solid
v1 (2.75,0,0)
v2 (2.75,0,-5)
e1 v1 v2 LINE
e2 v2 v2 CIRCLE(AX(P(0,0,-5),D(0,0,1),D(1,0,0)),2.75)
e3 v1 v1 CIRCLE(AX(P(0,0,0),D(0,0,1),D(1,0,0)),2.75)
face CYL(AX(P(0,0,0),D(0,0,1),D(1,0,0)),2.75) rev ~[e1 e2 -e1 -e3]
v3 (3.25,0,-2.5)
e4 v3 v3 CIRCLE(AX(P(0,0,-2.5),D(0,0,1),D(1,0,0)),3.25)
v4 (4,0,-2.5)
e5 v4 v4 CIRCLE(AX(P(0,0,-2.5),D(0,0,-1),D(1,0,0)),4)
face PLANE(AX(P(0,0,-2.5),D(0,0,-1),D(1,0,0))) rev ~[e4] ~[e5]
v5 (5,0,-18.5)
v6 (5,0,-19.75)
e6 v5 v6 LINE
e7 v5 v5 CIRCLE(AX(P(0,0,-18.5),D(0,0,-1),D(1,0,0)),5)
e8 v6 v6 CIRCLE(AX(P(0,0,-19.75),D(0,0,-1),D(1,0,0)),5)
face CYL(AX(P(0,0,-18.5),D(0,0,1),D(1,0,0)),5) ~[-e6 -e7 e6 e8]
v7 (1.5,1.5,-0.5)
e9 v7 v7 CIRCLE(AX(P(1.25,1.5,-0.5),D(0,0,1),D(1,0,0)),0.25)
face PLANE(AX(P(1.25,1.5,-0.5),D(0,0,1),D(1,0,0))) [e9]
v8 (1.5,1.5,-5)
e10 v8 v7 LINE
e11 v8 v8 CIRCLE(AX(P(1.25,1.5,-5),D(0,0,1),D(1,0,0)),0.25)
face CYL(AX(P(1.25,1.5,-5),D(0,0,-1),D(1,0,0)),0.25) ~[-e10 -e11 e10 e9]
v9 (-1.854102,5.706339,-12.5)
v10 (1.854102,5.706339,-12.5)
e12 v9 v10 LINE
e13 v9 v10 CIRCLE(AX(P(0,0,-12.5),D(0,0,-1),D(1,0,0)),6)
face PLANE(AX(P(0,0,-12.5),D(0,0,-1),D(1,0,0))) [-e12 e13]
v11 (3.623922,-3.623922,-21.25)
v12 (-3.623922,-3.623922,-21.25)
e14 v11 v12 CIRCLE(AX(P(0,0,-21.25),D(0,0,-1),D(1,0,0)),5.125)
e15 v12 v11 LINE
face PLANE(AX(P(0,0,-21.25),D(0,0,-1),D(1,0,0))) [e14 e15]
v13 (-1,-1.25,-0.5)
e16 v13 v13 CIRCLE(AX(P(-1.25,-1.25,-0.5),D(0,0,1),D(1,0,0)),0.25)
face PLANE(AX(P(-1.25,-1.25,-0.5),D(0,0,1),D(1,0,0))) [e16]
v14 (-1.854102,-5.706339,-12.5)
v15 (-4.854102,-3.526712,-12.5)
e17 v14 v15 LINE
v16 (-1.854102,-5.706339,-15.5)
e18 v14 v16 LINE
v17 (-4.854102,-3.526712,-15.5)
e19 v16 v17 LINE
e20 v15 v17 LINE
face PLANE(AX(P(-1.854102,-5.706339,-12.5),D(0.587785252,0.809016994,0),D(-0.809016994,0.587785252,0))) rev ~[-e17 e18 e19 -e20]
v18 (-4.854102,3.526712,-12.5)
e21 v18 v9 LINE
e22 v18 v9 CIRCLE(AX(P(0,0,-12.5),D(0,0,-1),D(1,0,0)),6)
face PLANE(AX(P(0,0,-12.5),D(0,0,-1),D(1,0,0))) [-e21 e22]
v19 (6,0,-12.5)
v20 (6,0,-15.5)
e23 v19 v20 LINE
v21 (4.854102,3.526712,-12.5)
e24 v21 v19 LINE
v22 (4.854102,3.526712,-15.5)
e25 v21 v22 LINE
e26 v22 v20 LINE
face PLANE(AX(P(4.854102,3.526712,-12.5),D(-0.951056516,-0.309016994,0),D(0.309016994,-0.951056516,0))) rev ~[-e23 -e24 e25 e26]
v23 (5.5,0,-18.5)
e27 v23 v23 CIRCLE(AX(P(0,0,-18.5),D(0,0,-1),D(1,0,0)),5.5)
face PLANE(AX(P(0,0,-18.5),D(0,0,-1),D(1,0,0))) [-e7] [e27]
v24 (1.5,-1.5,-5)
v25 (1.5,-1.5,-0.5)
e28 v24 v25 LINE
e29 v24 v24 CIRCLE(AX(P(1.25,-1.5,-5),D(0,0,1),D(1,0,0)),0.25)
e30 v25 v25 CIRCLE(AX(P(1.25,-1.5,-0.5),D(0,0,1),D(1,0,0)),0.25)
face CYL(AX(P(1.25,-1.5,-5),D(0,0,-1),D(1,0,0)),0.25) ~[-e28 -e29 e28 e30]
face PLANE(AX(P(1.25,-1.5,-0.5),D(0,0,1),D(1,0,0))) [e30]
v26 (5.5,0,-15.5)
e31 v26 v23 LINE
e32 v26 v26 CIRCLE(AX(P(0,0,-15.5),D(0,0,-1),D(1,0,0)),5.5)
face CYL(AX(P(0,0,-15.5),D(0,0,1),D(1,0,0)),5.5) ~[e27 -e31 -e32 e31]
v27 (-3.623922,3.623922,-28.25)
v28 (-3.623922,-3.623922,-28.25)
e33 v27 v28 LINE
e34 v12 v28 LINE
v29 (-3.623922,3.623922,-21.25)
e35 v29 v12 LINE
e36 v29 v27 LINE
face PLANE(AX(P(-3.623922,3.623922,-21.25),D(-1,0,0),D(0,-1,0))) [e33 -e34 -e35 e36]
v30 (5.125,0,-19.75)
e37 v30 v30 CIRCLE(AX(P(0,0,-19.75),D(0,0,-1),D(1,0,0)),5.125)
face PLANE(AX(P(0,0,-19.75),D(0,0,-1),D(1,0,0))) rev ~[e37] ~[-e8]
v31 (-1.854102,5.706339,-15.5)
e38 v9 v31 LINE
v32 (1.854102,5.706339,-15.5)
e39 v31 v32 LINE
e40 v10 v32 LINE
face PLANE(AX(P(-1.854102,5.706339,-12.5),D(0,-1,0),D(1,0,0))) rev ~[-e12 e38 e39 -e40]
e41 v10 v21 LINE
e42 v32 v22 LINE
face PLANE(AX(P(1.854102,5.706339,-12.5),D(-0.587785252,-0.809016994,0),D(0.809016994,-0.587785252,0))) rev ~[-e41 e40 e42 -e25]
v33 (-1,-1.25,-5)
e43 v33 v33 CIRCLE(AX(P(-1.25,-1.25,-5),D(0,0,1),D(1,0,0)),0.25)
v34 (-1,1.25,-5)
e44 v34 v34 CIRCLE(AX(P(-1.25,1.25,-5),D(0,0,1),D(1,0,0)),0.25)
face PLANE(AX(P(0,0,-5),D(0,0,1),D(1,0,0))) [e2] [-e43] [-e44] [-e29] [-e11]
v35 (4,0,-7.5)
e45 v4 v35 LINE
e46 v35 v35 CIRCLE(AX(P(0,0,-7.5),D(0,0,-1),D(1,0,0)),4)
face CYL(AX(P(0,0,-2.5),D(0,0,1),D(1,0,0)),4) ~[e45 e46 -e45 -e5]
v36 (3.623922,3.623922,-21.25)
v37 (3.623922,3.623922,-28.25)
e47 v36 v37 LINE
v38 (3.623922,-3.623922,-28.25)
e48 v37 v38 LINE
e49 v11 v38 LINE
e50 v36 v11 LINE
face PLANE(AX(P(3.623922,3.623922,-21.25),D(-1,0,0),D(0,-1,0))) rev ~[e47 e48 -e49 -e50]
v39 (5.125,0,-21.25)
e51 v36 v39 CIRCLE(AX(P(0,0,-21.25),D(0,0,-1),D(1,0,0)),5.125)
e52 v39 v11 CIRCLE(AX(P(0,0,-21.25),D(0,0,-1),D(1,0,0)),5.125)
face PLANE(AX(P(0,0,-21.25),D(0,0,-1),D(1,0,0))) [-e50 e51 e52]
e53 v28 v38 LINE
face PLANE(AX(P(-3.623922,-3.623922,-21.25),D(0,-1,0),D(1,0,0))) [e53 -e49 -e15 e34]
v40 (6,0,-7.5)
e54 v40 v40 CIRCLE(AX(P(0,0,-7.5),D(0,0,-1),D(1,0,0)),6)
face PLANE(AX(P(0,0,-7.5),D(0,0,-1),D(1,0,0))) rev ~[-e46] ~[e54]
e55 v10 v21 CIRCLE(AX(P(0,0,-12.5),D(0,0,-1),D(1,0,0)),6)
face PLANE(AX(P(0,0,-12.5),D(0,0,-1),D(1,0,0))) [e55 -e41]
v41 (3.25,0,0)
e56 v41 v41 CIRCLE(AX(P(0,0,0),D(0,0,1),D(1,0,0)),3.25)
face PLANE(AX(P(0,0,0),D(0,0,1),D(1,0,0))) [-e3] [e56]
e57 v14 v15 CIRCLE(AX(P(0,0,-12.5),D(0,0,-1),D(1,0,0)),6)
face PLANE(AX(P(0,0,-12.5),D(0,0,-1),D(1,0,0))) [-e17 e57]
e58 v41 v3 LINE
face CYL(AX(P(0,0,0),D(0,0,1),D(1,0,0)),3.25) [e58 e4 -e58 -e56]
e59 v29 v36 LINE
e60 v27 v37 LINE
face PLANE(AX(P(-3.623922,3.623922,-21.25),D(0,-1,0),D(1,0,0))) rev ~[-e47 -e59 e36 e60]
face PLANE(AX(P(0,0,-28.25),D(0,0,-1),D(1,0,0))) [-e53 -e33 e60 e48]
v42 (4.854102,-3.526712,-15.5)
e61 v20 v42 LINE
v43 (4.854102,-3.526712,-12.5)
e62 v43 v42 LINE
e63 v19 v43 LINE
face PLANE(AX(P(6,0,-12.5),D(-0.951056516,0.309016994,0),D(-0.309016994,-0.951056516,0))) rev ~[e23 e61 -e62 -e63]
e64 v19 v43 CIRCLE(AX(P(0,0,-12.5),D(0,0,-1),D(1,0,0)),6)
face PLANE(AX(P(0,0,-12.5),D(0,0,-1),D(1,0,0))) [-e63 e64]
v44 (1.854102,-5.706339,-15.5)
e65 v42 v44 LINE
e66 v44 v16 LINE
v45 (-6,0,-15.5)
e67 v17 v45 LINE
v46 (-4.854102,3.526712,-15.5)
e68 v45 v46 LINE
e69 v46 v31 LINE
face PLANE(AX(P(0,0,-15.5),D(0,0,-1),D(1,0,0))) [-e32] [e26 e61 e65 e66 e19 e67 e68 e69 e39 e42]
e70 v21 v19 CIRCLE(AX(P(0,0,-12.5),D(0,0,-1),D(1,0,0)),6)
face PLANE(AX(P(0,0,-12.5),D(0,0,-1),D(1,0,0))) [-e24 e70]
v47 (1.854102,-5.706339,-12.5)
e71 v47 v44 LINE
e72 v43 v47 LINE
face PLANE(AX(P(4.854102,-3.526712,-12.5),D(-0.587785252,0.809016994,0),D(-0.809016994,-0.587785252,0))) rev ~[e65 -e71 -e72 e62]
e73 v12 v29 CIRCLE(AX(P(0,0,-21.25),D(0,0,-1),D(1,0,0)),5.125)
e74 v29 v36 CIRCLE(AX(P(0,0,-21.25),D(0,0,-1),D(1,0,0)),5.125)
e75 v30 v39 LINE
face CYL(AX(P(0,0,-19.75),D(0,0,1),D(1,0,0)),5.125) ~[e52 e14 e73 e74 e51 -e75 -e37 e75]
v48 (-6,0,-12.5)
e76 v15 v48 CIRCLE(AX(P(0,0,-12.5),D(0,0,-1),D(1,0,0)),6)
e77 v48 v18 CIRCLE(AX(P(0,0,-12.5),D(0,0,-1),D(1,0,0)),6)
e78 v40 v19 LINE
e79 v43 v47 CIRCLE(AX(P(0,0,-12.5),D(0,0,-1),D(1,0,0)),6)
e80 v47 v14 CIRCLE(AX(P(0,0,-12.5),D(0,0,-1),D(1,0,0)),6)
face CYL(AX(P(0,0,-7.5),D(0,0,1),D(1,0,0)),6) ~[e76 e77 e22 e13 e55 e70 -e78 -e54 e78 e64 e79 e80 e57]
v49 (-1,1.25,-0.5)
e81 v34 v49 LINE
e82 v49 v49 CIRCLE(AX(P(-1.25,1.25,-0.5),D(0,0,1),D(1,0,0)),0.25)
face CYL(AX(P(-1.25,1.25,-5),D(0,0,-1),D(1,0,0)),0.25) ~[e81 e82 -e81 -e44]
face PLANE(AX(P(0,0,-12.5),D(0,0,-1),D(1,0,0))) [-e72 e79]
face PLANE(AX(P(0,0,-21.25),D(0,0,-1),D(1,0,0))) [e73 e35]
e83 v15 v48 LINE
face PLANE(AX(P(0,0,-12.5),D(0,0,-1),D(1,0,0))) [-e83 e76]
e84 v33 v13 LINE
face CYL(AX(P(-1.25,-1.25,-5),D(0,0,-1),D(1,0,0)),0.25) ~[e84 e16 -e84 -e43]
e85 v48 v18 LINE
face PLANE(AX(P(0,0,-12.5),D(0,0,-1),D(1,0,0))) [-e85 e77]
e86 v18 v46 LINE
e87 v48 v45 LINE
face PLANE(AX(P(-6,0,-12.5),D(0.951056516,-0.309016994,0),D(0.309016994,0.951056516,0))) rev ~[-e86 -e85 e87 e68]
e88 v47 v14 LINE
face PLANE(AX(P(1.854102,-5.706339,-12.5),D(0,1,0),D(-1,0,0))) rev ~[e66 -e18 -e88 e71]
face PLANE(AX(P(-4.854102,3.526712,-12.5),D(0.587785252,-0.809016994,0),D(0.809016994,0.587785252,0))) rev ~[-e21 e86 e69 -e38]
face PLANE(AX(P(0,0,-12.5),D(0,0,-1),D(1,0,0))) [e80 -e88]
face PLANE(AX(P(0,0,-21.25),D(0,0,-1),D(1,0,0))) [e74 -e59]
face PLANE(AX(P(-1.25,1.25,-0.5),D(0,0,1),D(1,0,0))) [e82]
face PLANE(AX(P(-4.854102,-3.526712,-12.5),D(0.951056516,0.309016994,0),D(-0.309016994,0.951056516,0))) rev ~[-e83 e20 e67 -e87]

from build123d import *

# Parameters (mm, degrees)
F0_R      = 3.25
F1_DEPTH  = 2.5
F2_R      = 4
F2_R_2    = 3.25
F3_DEPTH  = 5
F4_R      = 6
F4_R_2    = 4
F5_DEPTH  = 5
F7_DEPTH  = 3
F8_R      = 5.5
F9_DEPTH  = 3
F10_R     = 5
F11_DEPTH = 1.25
F12_R     = 5.125
F12_R_2   = 5
F13_DEPTH = 1.5
F14_W     = 7.2478445072
F14_H     = 7.2478445072
F15_DEPTH = 7
F16_R     = 2.75
F17_DEPTH = 5
F18_R     = 0.25
F19_DEPTH = 4.5


with BuildPart() as f1:
    # F0 (on Top) → F1 (new body)
    with BuildSketch(Plane.XY):
        Circle(F0_R)
    extrude(amount=-F1_DEPTH)

    # F2 (on face) → F3 (join)
    with BuildSketch(Plane(origin=(0, 0, -2.5), x_dir=(1, 0, 0), z_dir=(0, 0, -1))):
        Circle(F2_R)
        Circle(F2_R_2, mode=Mode.SUBTRACT)
        Circle(F2_R_2)
    extrude(amount=F3_DEPTH)

    # F4 (on face) → F5 (join)
    with BuildSketch(Plane(origin=(0, 0, -7.5), x_dir=(1, 0, 0), z_dir=(0, 0, -1))):
        Circle(F4_R)
        Circle(F4_R_2, mode=Mode.SUBTRACT)
        Circle(F4_R_2)
    extrude(amount=F5_DEPTH)

    # F6 (on face) → F7 (join)
    with BuildSketch(Plane(origin=(0, 0, -12.5), x_dir=(1, 0, 0), z_dir=(0, 0, -1))):
        Polygon((4.8541019662, -3.5267115138), (6, 0), (4.8541019662, 3.5267115138), (1.8541019662, 5.7063390978), (-1.8541019662, 5.7063390978), (-4.8541019662, 3.5267115138), (-6, 0), (-4.8541019662, -3.5267115138), (-1.8541019662, -5.7063390978), (1.8541019662, -5.7063390978), align=None)
    extrude(amount=F7_DEPTH)

    # F8 (on face) → F9 (join)
    with BuildSketch(Plane(origin=(0, 0, -15.5), x_dir=(1, 0, 0), z_dir=(0, 0, -1))):
        Circle(F8_R)
    extrude(amount=F9_DEPTH)

    # F10 (on face) → F11 (join)
    with BuildSketch(Plane(origin=(0, 0, -18.5), x_dir=(1, 0, 0), z_dir=(0, 0, -1))):
        Circle(F10_R)
    extrude(amount=F11_DEPTH)

    # F12 (on face) → F13 (join)
    with BuildSketch(Plane(origin=(0, 0, -19.75), x_dir=(1, 0, 0), z_dir=(0, 0, -1))):
        Circle(F12_R)
        Circle(F12_R_2, mode=Mode.SUBTRACT)
        Circle(F12_R_2)
    extrude(amount=F13_DEPTH)

    # F14 (on face) → F15 (join)
    with BuildSketch(Plane(origin=(0, 0, -21.25), x_dir=(1, 0, 0), z_dir=(0, 0, -1))):
        Rectangle(F14_W, F14_H)
    extrude(amount=F15_DEPTH)

    # F16 (on face) → F17 (cut)
    with BuildSketch(Plane.XY):
        Circle(F16_R)
    extrude(amount=-F17_DEPTH, mode=Mode.SUBTRACT)

    # F18 (on face) → F19 (join)
    with BuildSketch(Plane.XY.offset(-5)):
        with Locations((-1.25, -1.25)):
            Circle(F18_R)
        with Locations((1.25, -1.5)):
            Circle(F18_R)
        with Locations((1.25, 1.5)):
            Circle(F18_R)
        with Locations((-1.25, 1.25)):
            Circle(F18_R)
    extrude(amount=F19_DEPTH)


solid = f1.part
